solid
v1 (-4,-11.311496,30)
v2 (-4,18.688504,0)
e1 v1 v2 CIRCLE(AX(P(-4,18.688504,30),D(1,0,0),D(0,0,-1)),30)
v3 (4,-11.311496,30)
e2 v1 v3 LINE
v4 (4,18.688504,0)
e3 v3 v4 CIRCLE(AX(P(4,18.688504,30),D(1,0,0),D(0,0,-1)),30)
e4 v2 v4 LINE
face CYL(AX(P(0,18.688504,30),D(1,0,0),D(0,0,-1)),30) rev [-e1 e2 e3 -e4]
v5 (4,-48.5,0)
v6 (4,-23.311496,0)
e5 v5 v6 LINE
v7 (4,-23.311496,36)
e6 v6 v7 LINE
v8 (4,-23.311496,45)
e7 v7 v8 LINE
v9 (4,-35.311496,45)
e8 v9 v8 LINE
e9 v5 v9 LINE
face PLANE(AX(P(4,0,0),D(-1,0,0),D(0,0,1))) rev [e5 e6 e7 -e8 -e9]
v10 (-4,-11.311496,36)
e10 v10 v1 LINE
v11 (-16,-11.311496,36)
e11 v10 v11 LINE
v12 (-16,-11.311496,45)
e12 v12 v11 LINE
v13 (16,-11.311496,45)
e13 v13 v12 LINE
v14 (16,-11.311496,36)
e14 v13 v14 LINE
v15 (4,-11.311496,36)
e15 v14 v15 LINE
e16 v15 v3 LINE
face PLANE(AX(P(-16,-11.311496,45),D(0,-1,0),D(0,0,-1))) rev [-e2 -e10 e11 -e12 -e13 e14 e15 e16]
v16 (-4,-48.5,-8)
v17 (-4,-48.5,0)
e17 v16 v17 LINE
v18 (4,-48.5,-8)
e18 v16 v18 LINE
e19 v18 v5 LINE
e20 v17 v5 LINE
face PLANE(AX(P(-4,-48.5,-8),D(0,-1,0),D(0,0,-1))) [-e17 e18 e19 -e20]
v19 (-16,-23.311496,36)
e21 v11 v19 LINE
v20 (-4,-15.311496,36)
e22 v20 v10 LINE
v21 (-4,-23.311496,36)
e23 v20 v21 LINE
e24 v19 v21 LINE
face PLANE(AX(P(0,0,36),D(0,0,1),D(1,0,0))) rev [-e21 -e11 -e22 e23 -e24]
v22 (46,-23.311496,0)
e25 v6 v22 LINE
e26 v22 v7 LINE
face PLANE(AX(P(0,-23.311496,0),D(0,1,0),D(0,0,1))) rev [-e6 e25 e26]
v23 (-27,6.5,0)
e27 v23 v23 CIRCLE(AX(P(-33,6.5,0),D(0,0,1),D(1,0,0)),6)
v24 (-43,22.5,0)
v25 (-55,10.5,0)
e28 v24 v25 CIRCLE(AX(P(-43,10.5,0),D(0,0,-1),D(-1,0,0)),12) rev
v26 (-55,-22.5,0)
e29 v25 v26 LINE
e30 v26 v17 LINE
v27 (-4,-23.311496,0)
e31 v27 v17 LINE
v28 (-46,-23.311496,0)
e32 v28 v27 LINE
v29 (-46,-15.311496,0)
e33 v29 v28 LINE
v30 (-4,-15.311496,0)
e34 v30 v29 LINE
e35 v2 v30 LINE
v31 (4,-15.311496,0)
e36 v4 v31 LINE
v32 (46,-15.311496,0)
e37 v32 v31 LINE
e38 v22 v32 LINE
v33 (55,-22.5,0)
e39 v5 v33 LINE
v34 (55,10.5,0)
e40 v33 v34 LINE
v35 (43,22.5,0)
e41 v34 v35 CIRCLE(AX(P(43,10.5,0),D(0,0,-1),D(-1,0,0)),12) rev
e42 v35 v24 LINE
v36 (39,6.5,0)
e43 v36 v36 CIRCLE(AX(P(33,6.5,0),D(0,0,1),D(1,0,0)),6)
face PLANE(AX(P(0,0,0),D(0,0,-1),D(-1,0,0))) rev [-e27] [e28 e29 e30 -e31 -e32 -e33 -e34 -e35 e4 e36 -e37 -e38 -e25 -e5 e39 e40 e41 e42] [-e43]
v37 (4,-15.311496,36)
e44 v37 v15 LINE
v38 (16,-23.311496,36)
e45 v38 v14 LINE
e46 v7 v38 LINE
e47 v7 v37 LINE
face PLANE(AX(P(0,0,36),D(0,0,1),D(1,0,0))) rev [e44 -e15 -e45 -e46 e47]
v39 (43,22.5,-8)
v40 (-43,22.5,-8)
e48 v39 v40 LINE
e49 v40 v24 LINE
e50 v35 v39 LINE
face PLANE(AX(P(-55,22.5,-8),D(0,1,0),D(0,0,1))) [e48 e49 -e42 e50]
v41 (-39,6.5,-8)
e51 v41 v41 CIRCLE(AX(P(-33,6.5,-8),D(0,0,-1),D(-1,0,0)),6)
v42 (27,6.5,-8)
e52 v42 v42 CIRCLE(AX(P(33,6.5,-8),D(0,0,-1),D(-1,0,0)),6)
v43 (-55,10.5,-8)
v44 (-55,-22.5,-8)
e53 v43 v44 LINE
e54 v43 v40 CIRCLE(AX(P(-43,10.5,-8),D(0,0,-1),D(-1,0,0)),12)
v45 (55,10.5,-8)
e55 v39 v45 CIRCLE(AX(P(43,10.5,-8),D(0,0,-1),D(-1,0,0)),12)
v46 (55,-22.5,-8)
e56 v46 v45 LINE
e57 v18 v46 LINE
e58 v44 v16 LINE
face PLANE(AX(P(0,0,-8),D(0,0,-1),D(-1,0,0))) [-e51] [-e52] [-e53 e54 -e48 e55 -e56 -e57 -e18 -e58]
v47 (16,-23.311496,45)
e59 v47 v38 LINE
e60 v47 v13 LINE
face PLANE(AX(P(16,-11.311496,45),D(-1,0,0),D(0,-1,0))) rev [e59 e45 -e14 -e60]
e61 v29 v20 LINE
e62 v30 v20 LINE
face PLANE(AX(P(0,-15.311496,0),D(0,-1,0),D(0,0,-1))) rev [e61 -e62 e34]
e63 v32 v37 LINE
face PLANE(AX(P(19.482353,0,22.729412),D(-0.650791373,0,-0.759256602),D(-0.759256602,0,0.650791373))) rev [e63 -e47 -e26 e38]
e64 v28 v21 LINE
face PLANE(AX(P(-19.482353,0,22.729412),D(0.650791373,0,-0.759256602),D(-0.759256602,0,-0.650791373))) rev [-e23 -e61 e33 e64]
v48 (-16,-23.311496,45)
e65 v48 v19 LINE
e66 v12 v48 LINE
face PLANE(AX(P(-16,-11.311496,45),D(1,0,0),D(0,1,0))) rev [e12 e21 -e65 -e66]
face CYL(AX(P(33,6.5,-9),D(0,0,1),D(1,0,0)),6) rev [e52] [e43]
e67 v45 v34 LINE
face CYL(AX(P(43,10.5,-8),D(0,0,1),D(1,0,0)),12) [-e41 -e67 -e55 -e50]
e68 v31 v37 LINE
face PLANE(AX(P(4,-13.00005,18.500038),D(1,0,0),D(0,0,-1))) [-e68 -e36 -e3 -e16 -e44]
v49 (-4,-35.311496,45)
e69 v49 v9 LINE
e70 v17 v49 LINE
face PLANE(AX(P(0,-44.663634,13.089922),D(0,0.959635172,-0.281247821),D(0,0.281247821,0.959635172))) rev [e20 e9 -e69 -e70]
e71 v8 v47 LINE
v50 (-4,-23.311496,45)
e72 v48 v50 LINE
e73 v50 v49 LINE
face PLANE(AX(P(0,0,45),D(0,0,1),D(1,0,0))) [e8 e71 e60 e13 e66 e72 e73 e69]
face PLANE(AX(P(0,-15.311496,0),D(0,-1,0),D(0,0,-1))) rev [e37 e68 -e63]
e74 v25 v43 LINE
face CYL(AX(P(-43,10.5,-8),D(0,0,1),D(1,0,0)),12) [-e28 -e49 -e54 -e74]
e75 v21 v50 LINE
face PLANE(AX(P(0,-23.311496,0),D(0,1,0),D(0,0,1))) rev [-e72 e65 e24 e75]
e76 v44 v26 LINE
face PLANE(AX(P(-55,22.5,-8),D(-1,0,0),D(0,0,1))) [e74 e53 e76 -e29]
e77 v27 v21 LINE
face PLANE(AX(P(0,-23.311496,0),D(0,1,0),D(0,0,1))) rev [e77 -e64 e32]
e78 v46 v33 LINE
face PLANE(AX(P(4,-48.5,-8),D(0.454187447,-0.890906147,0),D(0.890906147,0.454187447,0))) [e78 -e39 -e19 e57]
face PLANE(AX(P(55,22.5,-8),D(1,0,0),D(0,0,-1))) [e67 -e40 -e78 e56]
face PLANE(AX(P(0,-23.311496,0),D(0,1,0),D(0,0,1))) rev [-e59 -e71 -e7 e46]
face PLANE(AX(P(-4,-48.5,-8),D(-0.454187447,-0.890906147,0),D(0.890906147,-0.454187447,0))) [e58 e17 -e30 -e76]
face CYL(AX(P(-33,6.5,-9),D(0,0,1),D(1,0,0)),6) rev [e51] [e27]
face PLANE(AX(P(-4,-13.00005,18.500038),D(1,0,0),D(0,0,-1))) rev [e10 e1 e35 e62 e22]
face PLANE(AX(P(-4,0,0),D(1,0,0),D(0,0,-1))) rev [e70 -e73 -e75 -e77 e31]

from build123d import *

# Parameters (mm, degrees)
BOSS_EXTRUDE1_DEPTH = 8
SKETCH4_W           = 32
SKETCH4_H           = 12
BOSS_EXTRUDE3_DEPTH = 9
RIB1_START          = -4
RIB1_DEPTH          = 8
FILLET1_R           = 12
SKETCH8_R           = 6
CUT_EXTRUDE1_DEPTH  = 9


# Read off the part's stored shape, not the designer's step: Rib1
with BuildPart() as part:
    # Sketch1 → Boss-Extrude1 (new body)
    with BuildSketch(Plane.XY):
        Polygon((-55, 22.5), (55, 22.5), (55, -22.5), (4, -48.5), (-4, -48.5), (-55, -22.5), align=None)
    extrude(amount=-BOSS_EXTRUDE1_DEPTH)

    # Sketch2 → Loft1 section 0
    with BuildSketch(Plane.XY):
        with BuildLine():
            Line((-46, -15.311496361), (46, -15.311496361))
            Line((46, -15.311496361), (46, -23.311496361))
            Line((46, -23.311496361), (-46, -23.311496361))
            Line((-46, -23.311496361), (-46, -15.311496361))
        make_face()
    # Sketch3 → Loft1 section 1
    with BuildSketch(Plane.XY.offset(36)):
        with BuildLine():
            Line((-4, -15.311496361), (4, -15.311496361))
            Line((4, -15.311496361), (4, -23.311496361))
            Line((4, -23.311496361), (-4, -23.311496361))
            Line((-4, -23.311496361), (-4, -15.311496361))
        make_face()
    loft()

    # Sketch4 → Boss-Extrude3 (add)
    with BuildSketch(Plane.XY.offset(36)):
        with Locations((0, -17.311496361)):
            Rectangle(SKETCH4_W, SKETCH4_H)
    extrude(amount=BOSS_EXTRUDE3_DEPTH)

    # Sketch6 → Loft3 section 0
    with BuildSketch(Plane.XY):
        with BuildLine():
            Line((-4, -23.311496361), (4, -23.311496361))
            Line((4, -23.311496361), (4, -48.5))
            Line((4, -48.5), (-4, -48.5))
            Line((-4, -48.5), (-4, -23.311496361))
        make_face()
    # Sketch5 → Loft3 section 1
    with BuildSketch(Plane.XY.offset(45)):
        with BuildLine():
            Line((-4, -35.311496361), (4, -35.311496361))
            Line((4, -35.311496361), (4, -23.311496361))
            Line((4, -23.311496361), (-4, -23.311496361))
            Line((-4, -23.311496361), (-4, -35.311496361))
        make_face()
    loft()

    # Rib1 outline → Rib1 (add)
    with BuildSketch(Plane(origin=(0, 0, 0), x_dir=(0, 0, -1), z_dir=(1, 0, 0)).offset(RIB1_START)):
        with BuildLine():
            Line((-30, -11.311496361), (-36, -11.311496361))
            Line((-36, -11.311496361), (-36, -15.311496361))
            Line((-36, -15.311496361), (0, -15.311496361))
            Line((0, -15.311496361), (0, 18.688503639))
            ThreePointArc((0, 18.688503639), (-8.786796565, -2.524699797), (-30, -11.311496361))
        make_face()
    extrude(amount=RIB1_DEPTH)

    # Fillet1
    fillet1_edges = [part.edges().sort_by_distance(p)[0] for p in [
        (-55, 22.5, -4),
        (55, 22.5, -4),
    ]]
    fillet(fillet1_edges, radius=FILLET1_R)

    # Sketch8 → Cut-Extrude1 (cut)
    with BuildSketch(Plane.XY):
        with Locations((-33, 6.5)):
            Circle(SKETCH8_R)
        with Locations((33, 6.5)):
            Circle(SKETCH8_R)
    extrude(amount=-CUT_EXTRUDE1_DEPTH, mode=Mode.SUBTRACT)


solid = part.part
